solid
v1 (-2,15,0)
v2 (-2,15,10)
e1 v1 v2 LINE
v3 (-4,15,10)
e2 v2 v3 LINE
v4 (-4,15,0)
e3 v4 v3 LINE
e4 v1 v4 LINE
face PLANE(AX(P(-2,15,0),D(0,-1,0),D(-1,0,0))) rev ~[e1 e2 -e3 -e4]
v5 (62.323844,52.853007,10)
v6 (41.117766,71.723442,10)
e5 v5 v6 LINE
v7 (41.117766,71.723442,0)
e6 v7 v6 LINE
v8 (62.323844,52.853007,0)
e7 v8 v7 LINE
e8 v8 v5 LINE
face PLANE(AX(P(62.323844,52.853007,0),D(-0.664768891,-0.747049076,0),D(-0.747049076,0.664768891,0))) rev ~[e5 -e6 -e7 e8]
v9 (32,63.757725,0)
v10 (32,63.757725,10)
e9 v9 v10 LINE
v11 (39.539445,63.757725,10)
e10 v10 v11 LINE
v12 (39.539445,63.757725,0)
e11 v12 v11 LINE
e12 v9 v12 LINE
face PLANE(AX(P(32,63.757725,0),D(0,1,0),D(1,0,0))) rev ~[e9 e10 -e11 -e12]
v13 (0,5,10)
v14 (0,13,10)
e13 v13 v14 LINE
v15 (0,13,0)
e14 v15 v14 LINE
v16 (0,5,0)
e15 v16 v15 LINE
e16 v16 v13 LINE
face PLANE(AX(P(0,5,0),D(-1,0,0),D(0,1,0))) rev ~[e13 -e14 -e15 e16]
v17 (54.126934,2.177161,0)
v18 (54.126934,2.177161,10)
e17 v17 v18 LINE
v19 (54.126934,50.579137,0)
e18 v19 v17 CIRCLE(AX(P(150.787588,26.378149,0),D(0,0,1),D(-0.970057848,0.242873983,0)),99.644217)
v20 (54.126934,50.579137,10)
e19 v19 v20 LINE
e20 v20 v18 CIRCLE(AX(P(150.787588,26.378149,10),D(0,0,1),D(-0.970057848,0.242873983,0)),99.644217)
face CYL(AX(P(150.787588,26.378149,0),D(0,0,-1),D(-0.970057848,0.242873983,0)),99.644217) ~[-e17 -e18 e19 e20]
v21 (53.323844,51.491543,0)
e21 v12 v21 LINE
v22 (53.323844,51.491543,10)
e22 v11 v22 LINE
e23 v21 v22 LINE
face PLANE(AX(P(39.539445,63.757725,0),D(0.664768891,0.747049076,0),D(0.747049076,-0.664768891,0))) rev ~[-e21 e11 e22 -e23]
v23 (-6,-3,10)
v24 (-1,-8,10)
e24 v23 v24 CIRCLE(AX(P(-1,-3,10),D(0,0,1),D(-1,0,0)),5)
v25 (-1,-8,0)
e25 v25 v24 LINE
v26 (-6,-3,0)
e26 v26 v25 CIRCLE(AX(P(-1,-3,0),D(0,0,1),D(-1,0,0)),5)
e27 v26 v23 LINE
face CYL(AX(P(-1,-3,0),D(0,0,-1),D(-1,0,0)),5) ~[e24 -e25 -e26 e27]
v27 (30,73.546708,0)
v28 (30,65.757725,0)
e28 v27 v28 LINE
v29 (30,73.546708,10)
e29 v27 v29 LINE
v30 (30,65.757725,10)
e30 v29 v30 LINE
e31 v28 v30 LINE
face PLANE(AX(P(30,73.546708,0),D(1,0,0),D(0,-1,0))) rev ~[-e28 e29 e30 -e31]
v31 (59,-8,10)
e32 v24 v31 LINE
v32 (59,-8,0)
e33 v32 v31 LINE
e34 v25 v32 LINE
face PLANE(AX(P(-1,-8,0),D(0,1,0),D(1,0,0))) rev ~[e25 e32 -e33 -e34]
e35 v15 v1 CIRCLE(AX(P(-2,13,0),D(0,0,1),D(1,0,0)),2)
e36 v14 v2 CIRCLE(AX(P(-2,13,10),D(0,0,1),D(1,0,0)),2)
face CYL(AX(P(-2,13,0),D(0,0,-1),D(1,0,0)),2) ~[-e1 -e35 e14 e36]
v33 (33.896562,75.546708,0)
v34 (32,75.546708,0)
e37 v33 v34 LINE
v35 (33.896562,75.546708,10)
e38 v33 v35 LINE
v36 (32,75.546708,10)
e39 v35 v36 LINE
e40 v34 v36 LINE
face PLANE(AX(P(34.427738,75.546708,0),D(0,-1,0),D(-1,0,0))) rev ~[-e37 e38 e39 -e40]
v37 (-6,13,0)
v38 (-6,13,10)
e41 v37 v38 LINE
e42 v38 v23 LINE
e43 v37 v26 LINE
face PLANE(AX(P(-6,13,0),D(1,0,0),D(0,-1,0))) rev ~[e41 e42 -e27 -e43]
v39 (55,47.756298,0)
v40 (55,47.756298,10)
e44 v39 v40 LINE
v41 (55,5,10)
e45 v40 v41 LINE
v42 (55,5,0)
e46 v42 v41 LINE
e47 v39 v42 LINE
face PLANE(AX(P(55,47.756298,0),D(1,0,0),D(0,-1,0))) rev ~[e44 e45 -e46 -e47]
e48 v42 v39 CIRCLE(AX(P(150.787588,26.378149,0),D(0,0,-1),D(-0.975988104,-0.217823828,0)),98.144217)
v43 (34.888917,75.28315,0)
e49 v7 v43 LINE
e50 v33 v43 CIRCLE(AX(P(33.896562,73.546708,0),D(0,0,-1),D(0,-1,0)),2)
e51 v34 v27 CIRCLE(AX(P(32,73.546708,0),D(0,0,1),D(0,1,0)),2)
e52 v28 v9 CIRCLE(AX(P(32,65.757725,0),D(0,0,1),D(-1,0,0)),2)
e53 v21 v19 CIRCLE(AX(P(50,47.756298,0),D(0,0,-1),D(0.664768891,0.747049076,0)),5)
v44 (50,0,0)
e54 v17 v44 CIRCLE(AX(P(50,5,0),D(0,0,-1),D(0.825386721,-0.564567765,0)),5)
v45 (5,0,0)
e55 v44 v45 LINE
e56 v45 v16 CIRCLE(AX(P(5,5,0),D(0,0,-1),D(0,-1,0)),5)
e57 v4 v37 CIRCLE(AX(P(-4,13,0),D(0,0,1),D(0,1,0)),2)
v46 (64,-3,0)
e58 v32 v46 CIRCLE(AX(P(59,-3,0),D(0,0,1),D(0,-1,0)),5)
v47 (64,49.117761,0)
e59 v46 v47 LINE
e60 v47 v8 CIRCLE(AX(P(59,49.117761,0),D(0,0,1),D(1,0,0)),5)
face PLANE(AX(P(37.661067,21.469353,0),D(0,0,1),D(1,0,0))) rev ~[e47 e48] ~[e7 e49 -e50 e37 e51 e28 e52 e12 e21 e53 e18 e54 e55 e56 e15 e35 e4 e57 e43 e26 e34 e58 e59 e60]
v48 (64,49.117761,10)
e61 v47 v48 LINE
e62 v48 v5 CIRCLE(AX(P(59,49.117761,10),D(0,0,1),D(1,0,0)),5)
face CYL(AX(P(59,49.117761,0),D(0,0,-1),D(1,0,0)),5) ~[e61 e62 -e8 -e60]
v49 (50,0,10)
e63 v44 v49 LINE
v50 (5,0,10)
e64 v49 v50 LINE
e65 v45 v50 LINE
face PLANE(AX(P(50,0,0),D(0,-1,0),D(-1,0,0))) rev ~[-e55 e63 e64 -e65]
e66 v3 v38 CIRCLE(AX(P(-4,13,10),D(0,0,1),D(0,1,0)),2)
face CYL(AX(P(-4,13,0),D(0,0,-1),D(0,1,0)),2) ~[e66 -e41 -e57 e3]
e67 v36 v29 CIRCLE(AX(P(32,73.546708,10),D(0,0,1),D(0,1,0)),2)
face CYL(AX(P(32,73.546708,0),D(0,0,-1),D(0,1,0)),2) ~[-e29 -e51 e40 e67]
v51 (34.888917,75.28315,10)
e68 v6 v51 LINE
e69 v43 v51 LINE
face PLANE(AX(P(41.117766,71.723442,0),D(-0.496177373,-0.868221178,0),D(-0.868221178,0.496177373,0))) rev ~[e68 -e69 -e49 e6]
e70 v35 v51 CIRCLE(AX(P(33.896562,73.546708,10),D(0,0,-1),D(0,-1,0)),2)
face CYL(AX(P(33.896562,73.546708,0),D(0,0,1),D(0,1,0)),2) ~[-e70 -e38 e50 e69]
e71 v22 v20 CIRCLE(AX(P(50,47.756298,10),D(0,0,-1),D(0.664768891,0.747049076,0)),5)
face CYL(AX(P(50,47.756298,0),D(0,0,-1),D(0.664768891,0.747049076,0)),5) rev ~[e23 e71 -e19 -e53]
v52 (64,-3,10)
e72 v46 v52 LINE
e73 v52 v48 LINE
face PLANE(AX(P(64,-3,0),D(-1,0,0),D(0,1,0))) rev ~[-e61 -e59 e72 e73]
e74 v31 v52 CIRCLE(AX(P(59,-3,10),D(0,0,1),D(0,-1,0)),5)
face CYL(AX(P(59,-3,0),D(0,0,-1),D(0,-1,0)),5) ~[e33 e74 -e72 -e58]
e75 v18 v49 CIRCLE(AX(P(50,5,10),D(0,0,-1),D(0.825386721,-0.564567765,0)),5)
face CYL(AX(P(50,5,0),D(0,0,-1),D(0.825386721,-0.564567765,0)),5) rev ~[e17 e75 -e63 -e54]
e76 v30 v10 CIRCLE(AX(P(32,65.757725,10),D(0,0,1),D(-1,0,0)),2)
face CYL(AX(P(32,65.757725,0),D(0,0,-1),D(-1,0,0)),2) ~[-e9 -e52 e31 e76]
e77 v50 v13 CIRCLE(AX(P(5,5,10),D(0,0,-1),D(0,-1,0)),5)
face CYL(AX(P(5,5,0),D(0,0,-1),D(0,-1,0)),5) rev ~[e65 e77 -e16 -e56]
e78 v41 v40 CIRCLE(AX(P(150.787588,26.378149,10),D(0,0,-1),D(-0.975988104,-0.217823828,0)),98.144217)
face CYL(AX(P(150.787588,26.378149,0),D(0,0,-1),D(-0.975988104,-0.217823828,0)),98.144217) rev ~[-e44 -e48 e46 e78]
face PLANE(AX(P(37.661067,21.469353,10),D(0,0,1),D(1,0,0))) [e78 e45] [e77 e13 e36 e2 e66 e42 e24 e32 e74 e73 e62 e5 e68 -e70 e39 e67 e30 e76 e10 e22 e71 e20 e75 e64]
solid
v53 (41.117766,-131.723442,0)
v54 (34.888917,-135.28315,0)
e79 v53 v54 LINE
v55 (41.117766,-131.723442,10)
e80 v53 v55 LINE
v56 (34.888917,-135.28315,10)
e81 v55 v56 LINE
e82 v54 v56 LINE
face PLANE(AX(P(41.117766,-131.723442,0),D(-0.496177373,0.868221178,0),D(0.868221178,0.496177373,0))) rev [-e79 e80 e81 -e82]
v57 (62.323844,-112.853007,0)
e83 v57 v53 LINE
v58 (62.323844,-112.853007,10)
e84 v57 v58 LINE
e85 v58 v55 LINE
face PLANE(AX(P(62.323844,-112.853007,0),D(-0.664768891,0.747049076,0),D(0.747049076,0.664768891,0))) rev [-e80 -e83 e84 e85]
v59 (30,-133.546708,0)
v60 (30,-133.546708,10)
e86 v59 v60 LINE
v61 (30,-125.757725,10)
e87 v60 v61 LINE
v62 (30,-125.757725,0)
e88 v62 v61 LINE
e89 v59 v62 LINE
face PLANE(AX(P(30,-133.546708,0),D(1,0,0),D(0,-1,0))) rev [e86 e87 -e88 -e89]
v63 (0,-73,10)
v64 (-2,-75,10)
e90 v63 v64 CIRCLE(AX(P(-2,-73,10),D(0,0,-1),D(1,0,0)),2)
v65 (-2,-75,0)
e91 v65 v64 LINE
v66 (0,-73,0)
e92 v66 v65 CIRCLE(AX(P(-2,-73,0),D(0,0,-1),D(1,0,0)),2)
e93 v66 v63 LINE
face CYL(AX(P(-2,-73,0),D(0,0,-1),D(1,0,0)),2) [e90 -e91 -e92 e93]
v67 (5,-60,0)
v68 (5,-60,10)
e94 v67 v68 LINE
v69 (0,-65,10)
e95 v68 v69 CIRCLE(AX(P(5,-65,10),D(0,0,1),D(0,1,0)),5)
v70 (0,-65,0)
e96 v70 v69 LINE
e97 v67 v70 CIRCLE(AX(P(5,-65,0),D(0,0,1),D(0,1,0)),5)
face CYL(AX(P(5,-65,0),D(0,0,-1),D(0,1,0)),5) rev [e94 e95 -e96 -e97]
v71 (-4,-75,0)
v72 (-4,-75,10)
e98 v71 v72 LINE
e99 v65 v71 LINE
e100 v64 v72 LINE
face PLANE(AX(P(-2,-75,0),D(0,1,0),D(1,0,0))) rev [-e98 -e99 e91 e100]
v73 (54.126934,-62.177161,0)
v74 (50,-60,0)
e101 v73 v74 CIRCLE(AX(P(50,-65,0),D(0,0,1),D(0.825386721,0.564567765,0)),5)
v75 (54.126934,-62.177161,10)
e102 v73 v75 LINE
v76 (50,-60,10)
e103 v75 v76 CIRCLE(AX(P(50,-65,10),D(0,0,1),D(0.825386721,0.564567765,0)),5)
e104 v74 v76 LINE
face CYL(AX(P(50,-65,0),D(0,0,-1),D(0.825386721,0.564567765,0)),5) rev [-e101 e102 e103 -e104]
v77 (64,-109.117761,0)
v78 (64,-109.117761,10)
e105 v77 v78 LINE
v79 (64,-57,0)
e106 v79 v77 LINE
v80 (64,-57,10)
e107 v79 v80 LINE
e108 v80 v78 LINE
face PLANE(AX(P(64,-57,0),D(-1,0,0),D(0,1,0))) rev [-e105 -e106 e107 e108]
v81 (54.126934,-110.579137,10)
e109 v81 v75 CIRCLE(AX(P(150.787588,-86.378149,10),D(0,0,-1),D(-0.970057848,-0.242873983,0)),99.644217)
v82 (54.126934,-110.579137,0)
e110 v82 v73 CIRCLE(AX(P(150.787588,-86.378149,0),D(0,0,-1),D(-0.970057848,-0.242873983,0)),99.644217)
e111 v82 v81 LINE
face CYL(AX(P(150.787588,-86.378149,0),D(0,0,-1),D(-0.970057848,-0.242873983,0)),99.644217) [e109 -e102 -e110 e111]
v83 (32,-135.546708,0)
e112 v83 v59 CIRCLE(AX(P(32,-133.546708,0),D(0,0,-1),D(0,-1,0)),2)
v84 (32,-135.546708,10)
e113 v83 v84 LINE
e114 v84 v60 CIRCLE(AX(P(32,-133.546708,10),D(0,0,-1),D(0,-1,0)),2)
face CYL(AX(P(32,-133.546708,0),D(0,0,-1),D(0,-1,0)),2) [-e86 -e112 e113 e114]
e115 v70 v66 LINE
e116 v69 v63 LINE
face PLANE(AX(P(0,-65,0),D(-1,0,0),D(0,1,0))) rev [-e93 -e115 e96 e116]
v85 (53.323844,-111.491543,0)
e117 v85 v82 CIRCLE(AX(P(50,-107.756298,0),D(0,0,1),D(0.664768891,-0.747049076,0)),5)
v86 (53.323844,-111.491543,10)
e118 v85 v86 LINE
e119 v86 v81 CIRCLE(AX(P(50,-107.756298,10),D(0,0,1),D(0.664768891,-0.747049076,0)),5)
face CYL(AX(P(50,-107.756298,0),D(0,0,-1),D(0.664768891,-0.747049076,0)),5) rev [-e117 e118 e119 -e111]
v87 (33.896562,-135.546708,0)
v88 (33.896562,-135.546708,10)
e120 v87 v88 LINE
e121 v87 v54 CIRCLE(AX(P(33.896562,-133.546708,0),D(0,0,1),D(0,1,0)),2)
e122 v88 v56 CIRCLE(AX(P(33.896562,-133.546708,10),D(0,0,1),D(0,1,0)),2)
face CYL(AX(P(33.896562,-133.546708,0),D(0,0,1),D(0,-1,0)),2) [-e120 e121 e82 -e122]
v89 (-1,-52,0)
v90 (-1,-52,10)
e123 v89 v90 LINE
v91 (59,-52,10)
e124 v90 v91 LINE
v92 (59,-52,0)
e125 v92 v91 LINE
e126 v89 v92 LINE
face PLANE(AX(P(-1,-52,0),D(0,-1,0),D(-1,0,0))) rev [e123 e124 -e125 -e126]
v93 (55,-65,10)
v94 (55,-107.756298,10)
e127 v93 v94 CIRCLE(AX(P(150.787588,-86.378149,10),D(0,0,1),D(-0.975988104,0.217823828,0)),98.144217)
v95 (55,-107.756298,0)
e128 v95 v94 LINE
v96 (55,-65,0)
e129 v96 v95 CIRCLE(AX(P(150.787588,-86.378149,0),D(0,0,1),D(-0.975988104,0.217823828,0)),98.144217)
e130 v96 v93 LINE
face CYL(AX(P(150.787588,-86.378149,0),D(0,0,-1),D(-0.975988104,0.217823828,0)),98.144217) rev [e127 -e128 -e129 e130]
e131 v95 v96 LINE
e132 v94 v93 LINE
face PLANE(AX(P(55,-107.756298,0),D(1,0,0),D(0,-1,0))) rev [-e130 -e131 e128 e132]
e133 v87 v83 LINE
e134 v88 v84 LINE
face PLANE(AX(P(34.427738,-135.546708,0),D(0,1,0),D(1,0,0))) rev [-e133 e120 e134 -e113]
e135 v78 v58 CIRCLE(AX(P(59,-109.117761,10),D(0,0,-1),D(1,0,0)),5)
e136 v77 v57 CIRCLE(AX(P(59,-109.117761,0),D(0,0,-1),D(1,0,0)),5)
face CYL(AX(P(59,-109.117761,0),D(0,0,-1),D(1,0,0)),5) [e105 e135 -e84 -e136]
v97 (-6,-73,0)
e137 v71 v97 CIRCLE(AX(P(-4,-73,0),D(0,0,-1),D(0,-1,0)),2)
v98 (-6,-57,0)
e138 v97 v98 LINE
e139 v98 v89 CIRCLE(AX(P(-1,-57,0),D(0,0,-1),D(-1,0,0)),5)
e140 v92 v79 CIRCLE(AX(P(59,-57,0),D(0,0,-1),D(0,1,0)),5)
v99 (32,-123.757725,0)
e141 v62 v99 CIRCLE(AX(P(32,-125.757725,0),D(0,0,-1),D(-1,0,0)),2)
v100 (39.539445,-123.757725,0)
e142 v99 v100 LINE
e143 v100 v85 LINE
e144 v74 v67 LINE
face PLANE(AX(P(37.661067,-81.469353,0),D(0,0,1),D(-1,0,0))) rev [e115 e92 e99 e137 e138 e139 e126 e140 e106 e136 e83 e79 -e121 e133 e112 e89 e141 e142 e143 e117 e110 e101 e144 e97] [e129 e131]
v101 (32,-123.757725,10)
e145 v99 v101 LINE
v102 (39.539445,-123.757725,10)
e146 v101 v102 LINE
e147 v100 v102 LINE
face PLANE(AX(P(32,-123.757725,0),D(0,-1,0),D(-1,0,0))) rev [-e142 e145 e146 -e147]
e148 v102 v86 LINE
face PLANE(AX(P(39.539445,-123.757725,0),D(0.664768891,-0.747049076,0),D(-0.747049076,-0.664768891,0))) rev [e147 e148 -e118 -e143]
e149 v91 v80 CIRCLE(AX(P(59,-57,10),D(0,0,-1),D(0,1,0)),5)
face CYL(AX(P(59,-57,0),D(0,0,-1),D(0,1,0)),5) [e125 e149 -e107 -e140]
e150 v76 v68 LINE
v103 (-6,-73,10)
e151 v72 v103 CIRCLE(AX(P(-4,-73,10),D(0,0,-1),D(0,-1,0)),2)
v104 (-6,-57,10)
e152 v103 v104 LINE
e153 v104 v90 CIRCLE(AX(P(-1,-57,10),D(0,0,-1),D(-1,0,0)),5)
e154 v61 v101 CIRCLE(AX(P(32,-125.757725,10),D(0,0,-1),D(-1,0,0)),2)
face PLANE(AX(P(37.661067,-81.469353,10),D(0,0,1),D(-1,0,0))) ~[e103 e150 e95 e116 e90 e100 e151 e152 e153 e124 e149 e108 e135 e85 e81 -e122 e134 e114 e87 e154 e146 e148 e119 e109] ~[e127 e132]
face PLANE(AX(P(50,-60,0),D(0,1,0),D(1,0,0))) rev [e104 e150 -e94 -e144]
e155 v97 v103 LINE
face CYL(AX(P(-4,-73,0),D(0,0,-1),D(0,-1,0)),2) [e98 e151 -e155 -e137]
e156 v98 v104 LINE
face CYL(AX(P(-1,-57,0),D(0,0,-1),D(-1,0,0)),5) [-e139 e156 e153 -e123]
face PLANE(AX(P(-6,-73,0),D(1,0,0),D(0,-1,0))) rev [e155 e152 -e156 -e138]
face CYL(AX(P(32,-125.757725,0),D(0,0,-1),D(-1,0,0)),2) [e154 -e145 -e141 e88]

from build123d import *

# Parameters (mm, degrees)
F1_DEPTH = 10
F2_R     = 2


with BuildPart() as f1:
    # F0 (on Top) → F1 (new body)
    with BuildSketch(Plane.XY):
        with BuildLine():
            Line((0, 5), (0, 13))
            ThreePointArc((0, 13), (-0.5857864376, 14.4142135624), (-2, 15))
            Line((-2, 15), (-4, 15))
            ThreePointArc((-4, 15), (-5.4142135624, 14.4142135624), (-6, 13))
            Line((-6, 13), (-6, -3))
            ThreePointArc((-6, -3), (-4.5355339059, -6.5355339059), (-1, -8))
            Line((-1, -8), (59, -8))
            ThreePointArc((59, -8), (62.5355339059, -6.5355339059), (64, -3))
            Line((64, -3), (64, 49.1177613581))
            ThreePointArc((64, 49.1177613581), (63.5617552688, 51.164805292), (62.3238444529, 52.8530067386))
            Line((62.3238444529, 52.8530067386), (41.117766383, 71.7234416849))
            Line((41.117766383, 71.7234416849), (34.4277384529, 75.5467076555))
            Line((34.4277384529, 75.5467076555), (32, 75.5467076555))
            ThreePointArc((32, 75.5467076555), (30.5857864376, 74.9609212178), (30, 73.5467076555))
            Line((30, 73.5467076555), (30, 71.4909657836))
            Line((30, 71.4909657836), (30, 66.5854863102))
            Line((30, 66.5854863102), (30, 65.75772506))
            ThreePointArc((30, 65.75772506), (30.5857864376, 64.3435114976), (32, 63.75772506))
            Line((32, 63.75772506), (33.0982006717, 63.75772506))
            Line((33.0982006717, 63.75772506), (39.5394453007, 63.75772506))
            Line((39.5394453007, 63.75772506), (53.3238444529, 51.4915433258))
            ThreePointArc((53.3238444529, 51.4915433258), (53.7532179323, 51.0598347094), (54.1269336048, 50.5791367685))
            ThreePointArc((54.1269336048, 50.5791367685), (51.143371317, 26.3781489726), (54.1269336048, 2.1771611768))
            ThreePointArc((54.1269336048, 2.1771611768), (52.333002988, 0.5776593236), (50, 0))
            Line((50, 0), (5, 0))
            ThreePointArc((5, 0), (1.4644660941, 1.4644660941), (0, 5))
        make_face()
        with BuildLine():
            Line((55, 47.7562979452), (55, 5))
            ThreePointArc((55, 5), (52.643371317, 26.3781489726), (55, 47.7562979452))
        make_face(mode=Mode.SUBTRACT)
    extrude(amount=F1_DEPTH)

    # F2
    f2_edges = [f1.edges().sort_by_distance(p)[0] for p in [
        (34.427738, 75.546708, 5),
    ]]
    fillet(f2_edges, radius=F2_R)


with BuildPart() as f4_1:
    # F4: instance of F1
    add(f1.part.mirror(Plane.XZ.offset(30)))


solid = Compound([f1.part, f4_1.part])
